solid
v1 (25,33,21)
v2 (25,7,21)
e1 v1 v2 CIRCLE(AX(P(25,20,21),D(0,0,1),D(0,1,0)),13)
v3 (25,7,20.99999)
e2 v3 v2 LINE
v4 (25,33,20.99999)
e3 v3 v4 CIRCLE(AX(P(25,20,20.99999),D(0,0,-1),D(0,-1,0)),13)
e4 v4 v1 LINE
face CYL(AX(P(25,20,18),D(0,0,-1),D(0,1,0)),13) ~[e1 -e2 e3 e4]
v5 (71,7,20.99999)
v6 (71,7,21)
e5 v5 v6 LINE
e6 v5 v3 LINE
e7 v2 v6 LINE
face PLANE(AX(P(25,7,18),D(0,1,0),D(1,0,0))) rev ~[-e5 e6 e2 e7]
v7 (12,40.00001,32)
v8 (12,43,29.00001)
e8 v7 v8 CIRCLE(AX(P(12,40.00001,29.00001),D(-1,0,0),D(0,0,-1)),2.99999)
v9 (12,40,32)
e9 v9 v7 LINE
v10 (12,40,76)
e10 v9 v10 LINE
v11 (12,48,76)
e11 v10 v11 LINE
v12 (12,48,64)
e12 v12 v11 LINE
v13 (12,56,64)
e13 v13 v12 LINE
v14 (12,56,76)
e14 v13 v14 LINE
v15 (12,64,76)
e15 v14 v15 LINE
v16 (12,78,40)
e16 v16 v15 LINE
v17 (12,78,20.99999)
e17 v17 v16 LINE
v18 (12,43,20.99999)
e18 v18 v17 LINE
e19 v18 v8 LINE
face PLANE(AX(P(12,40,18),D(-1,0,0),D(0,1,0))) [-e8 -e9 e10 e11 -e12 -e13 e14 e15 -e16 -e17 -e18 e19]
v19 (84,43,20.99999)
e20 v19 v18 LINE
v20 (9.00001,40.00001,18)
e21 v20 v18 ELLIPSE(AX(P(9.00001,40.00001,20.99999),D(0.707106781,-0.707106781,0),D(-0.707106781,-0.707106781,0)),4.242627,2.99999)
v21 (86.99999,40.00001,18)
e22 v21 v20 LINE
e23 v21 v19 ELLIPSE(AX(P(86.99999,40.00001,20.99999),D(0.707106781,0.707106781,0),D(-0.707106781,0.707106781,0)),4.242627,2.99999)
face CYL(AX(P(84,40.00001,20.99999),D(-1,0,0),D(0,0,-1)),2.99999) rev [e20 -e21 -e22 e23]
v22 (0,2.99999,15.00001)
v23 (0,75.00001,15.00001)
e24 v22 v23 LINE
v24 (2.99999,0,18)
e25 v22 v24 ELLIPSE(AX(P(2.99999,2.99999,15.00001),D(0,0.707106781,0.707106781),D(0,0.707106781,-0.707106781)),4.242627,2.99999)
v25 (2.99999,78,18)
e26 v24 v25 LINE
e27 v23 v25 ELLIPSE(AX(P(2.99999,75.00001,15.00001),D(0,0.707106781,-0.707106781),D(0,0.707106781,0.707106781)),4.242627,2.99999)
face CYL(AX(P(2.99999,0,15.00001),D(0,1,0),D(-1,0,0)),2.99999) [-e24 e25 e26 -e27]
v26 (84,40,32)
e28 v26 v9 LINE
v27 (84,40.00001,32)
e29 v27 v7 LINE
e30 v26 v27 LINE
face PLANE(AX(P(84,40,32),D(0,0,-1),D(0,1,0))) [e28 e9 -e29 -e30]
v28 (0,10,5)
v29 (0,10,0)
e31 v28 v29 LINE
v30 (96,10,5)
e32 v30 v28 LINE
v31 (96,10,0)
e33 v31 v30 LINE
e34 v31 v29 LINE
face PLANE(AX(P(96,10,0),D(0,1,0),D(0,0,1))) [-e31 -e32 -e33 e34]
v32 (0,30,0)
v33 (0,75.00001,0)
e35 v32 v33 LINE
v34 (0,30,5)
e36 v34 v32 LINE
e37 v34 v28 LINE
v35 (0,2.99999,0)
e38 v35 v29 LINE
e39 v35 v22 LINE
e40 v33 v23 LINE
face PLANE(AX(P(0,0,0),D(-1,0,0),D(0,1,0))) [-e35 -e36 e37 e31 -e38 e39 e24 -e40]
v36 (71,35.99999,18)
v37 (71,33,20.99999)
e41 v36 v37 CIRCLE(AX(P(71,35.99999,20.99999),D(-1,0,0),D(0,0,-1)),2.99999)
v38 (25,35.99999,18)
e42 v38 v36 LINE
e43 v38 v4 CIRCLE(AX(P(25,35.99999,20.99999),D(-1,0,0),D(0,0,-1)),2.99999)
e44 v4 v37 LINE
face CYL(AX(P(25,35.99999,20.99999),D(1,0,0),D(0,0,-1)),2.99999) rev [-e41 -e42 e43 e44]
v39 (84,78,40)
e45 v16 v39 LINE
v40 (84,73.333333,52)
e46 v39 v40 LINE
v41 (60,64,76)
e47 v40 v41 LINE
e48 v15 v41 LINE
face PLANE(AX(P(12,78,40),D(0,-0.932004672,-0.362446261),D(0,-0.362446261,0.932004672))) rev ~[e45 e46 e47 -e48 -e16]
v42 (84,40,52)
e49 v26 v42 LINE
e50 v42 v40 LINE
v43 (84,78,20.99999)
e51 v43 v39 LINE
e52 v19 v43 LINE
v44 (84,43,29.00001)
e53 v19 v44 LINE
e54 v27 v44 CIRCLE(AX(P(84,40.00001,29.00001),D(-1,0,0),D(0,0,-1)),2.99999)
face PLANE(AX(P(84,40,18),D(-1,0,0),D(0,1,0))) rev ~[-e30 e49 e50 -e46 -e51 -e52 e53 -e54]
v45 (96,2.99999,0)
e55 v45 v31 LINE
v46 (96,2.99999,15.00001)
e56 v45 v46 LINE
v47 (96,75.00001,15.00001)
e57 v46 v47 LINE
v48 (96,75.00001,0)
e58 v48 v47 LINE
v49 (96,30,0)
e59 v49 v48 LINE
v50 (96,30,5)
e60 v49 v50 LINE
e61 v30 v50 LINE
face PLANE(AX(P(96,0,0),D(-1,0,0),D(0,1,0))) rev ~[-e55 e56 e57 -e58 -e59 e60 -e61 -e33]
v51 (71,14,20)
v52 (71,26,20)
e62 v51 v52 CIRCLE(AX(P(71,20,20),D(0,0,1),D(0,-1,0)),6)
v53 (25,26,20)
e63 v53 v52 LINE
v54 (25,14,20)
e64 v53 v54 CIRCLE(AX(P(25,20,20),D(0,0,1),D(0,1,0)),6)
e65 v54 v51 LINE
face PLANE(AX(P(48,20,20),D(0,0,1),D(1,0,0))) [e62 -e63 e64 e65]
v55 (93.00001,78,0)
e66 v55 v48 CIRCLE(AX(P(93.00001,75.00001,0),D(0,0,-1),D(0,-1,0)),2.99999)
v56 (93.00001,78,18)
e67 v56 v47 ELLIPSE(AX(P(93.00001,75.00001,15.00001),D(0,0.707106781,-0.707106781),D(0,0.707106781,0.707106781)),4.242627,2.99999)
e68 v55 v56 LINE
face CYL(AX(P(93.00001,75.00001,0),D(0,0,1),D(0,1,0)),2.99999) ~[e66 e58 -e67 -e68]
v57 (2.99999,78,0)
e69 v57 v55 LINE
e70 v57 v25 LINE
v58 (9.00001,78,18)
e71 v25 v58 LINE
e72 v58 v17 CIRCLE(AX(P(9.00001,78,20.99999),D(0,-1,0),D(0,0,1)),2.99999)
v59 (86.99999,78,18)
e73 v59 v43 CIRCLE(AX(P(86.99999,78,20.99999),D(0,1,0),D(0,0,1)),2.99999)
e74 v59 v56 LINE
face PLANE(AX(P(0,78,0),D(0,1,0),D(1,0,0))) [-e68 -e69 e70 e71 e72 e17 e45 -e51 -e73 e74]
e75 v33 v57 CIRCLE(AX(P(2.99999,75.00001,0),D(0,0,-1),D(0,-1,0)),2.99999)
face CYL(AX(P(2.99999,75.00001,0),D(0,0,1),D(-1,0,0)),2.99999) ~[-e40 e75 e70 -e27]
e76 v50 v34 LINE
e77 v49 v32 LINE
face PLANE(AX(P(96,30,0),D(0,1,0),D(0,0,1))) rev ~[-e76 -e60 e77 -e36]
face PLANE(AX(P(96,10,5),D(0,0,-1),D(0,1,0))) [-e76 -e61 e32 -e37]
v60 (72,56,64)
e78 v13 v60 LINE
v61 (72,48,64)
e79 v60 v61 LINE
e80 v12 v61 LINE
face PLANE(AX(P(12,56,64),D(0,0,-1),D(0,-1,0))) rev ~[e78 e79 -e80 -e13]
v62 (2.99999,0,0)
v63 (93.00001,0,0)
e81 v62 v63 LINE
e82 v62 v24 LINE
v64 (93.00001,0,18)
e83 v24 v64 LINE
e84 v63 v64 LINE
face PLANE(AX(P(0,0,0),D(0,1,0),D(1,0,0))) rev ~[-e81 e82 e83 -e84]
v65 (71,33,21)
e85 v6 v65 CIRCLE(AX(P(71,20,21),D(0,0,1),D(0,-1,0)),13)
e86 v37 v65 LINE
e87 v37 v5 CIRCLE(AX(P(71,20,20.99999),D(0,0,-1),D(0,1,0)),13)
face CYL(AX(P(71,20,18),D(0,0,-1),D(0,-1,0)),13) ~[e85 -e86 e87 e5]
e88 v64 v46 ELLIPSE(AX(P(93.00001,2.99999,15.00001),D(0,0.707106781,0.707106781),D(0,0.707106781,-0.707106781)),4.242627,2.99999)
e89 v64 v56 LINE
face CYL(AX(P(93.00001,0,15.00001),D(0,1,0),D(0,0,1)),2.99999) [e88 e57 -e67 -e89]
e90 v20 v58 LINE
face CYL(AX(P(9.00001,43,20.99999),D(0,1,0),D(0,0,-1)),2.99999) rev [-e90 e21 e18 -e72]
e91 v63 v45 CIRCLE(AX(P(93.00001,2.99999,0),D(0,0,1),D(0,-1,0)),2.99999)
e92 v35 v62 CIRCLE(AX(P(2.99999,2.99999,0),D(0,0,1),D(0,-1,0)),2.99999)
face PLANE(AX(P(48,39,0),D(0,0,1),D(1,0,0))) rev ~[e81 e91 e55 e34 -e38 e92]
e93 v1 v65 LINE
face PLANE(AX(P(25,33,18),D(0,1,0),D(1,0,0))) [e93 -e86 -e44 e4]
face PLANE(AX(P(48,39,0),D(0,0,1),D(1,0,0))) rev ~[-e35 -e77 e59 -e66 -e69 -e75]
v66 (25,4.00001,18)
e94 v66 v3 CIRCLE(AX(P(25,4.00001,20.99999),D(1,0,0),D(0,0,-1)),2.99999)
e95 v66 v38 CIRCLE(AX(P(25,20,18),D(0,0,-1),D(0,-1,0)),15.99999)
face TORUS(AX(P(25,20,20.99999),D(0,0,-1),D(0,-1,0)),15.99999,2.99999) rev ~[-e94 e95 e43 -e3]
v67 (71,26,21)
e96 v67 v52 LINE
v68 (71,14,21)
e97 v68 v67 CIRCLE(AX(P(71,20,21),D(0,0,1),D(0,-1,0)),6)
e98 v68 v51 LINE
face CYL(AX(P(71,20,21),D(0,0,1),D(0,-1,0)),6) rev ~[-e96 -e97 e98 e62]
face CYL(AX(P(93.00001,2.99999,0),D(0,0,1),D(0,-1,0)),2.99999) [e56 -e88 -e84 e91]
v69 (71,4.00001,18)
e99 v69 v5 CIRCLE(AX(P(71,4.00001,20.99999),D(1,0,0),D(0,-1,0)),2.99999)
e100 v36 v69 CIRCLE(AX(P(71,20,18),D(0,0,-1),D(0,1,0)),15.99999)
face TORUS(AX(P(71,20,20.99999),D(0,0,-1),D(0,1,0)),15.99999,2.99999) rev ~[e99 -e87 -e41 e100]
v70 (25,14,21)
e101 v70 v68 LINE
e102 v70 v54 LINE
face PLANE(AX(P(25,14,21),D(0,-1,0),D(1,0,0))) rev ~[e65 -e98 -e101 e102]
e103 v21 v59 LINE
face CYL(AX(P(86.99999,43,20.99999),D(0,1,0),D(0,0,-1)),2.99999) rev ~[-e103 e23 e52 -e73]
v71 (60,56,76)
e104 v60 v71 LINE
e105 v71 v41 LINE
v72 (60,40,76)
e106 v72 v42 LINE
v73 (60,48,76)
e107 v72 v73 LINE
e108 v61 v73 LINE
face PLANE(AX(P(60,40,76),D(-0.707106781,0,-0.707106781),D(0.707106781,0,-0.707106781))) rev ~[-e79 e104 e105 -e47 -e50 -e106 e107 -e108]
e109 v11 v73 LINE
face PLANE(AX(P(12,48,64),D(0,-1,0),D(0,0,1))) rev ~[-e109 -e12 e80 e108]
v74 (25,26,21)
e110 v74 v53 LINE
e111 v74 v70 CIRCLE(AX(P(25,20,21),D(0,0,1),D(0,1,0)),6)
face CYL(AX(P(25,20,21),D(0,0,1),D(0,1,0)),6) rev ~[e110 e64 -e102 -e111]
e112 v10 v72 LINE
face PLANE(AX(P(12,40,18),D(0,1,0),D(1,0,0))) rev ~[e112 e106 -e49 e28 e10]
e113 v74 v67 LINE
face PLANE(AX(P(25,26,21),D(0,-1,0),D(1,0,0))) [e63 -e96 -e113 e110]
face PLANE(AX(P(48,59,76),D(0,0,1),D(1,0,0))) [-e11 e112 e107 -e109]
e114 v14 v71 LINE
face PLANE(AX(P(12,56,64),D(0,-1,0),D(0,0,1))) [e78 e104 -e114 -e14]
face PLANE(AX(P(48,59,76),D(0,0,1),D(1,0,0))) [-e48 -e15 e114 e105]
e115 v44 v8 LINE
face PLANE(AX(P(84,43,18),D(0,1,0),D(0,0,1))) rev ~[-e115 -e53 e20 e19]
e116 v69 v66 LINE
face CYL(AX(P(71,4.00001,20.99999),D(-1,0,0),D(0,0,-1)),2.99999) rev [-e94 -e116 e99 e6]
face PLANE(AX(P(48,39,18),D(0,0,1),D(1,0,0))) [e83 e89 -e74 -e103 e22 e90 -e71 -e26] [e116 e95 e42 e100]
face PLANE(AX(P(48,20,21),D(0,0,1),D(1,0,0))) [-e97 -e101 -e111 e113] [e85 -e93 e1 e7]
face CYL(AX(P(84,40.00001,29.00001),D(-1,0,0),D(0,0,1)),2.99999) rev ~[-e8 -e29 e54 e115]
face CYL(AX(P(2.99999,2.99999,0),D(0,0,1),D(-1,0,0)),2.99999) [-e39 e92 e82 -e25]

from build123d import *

# Parameters (mm, degrees)
F0_W      = 96
F0_H      = 78
F1_DEPTH  = 18
F3_W      = 72
F3_H      = 38
F5_DEPTH  = 58
F7_DEPTH  = 38
F8_W      = 8
F8_H      = 12
F9_DEPTH  = 60.001
F11_DEPTH = 72.001
F12_W     = 20
F12_H     = 5
F13_DEPTH = 96.001
F14_W     = 46
F14_H     = 26
F15_DEPTH = 3
F16_W     = 46
F16_H     = 12
F17_DEPTH = 1
F18_W     = 3
F18_H     = 14
F19_DEPTH = 72
F20_R     = 2.99999


# Not quite as in the source:
# - a fillet or chamfer is up to 0.001 mm smaller than in the source, because OpenCascade refuses the exact size


with BuildPart() as f1:
    # F0 (on Top) → F1 (new body)
    with BuildSketch(Plane.XY):
        with Locations((48, 39)):
            Rectangle(F0_W, F0_H)
    extrude(amount=F1_DEPTH)

    # F3 (on face) → F5 (join, through all)
    with BuildSketch(Plane.XY.offset(18)):
        with Locations((48, 59)):
            Rectangle(F3_W, F3_H)
    extrude(amount=F5_DEPTH)

    # F6 (on face) → F7 (cut, through all)
    with BuildSketch(Plane.XZ.offset(-40)):
        Polygon((84, 76), (60, 76), (84, 52), align=None)
    extrude(amount=-F7_DEPTH, mode=Mode.SUBTRACT)

    # F8 (on face) → F9 (cut, through all)
    with BuildSketch(Plane(origin=(12, 0, 0), x_dir=(0, -1, 0), z_dir=(-1, 0, 0))):
        with Locations((-52, 70)):
            Rectangle(F8_W, F8_H)
    extrude(amount=-F9_DEPTH, mode=Mode.SUBTRACT)

    # F10 (on face) → F11 (cut, through all)
    with BuildSketch(Plane(origin=(12, 0, 0), x_dir=(0, -1, 0), z_dir=(-1, 0, 0))):
        Polygon((-64, 76), (-78, 76), (-78, 40), align=None)
    extrude(amount=-F11_DEPTH, mode=Mode.SUBTRACT)

    # F12 (on face) → F13 (cut, through all)
    with BuildSketch(Plane.YZ.offset(96)):
        with Locations((20, 2.5)):
            Rectangle(F12_W, F12_H)
    extrude(amount=-F13_DEPTH, mode=Mode.SUBTRACT)

    # F14 (on face) → F15 (join)
    with BuildSketch(Plane.XY.offset(18)):
        with Locations((48, 19.9999999999)):
            Rectangle(F14_W, F14_H)
        with BuildLine():
            Line((25, 6.9999999999), (25, 32.9999999999))
            ThreePointArc((25, 32.9999999999), (12, 19.9999999999), (25, 6.9999999999))
        make_face()
        with BuildLine():
            ThreePointArc((71, 6.9999999999), (84, 19.9999999999), (71, 32.9999999999))
            Line((71, 32.9999999999), (71, 6.9999999999))
        make_face()
    extrude(amount=F15_DEPTH)

    # F16 (on face) → F17 (cut, through all)
    with BuildSketch(Plane.XY.offset(21)):
        with Locations((48, 19.9999999999)):
            Rectangle(F16_W, F16_H)
        with BuildLine():
            Line((25, 13.9999999999), (25, 25.9999999999))
            ThreePointArc((25, 25.9999999999), (19, 19.9999999999), (25, 13.9999999999))
        make_face()
        with BuildLine():
            ThreePointArc((71, 13.9999999999), (77, 19.9999999999), (71, 25.9999999999))
            Line((71, 25.9999999999), (71, 13.9999999999))
        make_face()
    extrude(amount=-F17_DEPTH, mode=Mode.SUBTRACT)

    # F18 (on face) → F19 (cut, through all)
    with BuildSketch(Plane.YZ.offset(84)):
        with Locations((41.5, 25)):
            Rectangle(F18_W, F18_H)
    extrude(amount=-F19_DEPTH, mode=Mode.SUBTRACT)

    # F20 (radius 3 in the source; OpenCascade refuses exactly that, so slightly less here)
    f20_edges = [f1.edges().sort_by_distance(p)[0] for p in [
        (48, 43, 32),
        (48, 43, 18),
        (48, 33, 18),
        (48, 7, 18),
        (96, 39, 18),
        (0, 39, 18),
        (84, 60.5, 18),
        (12, 60.5, 18),
        (96, 0, 9),
        (0, 0, 9),
        (0, 78, 9),
        (96, 78, 9),
    ]]
    fillet(f20_edges, radius=F20_R)


solid = f1.part
